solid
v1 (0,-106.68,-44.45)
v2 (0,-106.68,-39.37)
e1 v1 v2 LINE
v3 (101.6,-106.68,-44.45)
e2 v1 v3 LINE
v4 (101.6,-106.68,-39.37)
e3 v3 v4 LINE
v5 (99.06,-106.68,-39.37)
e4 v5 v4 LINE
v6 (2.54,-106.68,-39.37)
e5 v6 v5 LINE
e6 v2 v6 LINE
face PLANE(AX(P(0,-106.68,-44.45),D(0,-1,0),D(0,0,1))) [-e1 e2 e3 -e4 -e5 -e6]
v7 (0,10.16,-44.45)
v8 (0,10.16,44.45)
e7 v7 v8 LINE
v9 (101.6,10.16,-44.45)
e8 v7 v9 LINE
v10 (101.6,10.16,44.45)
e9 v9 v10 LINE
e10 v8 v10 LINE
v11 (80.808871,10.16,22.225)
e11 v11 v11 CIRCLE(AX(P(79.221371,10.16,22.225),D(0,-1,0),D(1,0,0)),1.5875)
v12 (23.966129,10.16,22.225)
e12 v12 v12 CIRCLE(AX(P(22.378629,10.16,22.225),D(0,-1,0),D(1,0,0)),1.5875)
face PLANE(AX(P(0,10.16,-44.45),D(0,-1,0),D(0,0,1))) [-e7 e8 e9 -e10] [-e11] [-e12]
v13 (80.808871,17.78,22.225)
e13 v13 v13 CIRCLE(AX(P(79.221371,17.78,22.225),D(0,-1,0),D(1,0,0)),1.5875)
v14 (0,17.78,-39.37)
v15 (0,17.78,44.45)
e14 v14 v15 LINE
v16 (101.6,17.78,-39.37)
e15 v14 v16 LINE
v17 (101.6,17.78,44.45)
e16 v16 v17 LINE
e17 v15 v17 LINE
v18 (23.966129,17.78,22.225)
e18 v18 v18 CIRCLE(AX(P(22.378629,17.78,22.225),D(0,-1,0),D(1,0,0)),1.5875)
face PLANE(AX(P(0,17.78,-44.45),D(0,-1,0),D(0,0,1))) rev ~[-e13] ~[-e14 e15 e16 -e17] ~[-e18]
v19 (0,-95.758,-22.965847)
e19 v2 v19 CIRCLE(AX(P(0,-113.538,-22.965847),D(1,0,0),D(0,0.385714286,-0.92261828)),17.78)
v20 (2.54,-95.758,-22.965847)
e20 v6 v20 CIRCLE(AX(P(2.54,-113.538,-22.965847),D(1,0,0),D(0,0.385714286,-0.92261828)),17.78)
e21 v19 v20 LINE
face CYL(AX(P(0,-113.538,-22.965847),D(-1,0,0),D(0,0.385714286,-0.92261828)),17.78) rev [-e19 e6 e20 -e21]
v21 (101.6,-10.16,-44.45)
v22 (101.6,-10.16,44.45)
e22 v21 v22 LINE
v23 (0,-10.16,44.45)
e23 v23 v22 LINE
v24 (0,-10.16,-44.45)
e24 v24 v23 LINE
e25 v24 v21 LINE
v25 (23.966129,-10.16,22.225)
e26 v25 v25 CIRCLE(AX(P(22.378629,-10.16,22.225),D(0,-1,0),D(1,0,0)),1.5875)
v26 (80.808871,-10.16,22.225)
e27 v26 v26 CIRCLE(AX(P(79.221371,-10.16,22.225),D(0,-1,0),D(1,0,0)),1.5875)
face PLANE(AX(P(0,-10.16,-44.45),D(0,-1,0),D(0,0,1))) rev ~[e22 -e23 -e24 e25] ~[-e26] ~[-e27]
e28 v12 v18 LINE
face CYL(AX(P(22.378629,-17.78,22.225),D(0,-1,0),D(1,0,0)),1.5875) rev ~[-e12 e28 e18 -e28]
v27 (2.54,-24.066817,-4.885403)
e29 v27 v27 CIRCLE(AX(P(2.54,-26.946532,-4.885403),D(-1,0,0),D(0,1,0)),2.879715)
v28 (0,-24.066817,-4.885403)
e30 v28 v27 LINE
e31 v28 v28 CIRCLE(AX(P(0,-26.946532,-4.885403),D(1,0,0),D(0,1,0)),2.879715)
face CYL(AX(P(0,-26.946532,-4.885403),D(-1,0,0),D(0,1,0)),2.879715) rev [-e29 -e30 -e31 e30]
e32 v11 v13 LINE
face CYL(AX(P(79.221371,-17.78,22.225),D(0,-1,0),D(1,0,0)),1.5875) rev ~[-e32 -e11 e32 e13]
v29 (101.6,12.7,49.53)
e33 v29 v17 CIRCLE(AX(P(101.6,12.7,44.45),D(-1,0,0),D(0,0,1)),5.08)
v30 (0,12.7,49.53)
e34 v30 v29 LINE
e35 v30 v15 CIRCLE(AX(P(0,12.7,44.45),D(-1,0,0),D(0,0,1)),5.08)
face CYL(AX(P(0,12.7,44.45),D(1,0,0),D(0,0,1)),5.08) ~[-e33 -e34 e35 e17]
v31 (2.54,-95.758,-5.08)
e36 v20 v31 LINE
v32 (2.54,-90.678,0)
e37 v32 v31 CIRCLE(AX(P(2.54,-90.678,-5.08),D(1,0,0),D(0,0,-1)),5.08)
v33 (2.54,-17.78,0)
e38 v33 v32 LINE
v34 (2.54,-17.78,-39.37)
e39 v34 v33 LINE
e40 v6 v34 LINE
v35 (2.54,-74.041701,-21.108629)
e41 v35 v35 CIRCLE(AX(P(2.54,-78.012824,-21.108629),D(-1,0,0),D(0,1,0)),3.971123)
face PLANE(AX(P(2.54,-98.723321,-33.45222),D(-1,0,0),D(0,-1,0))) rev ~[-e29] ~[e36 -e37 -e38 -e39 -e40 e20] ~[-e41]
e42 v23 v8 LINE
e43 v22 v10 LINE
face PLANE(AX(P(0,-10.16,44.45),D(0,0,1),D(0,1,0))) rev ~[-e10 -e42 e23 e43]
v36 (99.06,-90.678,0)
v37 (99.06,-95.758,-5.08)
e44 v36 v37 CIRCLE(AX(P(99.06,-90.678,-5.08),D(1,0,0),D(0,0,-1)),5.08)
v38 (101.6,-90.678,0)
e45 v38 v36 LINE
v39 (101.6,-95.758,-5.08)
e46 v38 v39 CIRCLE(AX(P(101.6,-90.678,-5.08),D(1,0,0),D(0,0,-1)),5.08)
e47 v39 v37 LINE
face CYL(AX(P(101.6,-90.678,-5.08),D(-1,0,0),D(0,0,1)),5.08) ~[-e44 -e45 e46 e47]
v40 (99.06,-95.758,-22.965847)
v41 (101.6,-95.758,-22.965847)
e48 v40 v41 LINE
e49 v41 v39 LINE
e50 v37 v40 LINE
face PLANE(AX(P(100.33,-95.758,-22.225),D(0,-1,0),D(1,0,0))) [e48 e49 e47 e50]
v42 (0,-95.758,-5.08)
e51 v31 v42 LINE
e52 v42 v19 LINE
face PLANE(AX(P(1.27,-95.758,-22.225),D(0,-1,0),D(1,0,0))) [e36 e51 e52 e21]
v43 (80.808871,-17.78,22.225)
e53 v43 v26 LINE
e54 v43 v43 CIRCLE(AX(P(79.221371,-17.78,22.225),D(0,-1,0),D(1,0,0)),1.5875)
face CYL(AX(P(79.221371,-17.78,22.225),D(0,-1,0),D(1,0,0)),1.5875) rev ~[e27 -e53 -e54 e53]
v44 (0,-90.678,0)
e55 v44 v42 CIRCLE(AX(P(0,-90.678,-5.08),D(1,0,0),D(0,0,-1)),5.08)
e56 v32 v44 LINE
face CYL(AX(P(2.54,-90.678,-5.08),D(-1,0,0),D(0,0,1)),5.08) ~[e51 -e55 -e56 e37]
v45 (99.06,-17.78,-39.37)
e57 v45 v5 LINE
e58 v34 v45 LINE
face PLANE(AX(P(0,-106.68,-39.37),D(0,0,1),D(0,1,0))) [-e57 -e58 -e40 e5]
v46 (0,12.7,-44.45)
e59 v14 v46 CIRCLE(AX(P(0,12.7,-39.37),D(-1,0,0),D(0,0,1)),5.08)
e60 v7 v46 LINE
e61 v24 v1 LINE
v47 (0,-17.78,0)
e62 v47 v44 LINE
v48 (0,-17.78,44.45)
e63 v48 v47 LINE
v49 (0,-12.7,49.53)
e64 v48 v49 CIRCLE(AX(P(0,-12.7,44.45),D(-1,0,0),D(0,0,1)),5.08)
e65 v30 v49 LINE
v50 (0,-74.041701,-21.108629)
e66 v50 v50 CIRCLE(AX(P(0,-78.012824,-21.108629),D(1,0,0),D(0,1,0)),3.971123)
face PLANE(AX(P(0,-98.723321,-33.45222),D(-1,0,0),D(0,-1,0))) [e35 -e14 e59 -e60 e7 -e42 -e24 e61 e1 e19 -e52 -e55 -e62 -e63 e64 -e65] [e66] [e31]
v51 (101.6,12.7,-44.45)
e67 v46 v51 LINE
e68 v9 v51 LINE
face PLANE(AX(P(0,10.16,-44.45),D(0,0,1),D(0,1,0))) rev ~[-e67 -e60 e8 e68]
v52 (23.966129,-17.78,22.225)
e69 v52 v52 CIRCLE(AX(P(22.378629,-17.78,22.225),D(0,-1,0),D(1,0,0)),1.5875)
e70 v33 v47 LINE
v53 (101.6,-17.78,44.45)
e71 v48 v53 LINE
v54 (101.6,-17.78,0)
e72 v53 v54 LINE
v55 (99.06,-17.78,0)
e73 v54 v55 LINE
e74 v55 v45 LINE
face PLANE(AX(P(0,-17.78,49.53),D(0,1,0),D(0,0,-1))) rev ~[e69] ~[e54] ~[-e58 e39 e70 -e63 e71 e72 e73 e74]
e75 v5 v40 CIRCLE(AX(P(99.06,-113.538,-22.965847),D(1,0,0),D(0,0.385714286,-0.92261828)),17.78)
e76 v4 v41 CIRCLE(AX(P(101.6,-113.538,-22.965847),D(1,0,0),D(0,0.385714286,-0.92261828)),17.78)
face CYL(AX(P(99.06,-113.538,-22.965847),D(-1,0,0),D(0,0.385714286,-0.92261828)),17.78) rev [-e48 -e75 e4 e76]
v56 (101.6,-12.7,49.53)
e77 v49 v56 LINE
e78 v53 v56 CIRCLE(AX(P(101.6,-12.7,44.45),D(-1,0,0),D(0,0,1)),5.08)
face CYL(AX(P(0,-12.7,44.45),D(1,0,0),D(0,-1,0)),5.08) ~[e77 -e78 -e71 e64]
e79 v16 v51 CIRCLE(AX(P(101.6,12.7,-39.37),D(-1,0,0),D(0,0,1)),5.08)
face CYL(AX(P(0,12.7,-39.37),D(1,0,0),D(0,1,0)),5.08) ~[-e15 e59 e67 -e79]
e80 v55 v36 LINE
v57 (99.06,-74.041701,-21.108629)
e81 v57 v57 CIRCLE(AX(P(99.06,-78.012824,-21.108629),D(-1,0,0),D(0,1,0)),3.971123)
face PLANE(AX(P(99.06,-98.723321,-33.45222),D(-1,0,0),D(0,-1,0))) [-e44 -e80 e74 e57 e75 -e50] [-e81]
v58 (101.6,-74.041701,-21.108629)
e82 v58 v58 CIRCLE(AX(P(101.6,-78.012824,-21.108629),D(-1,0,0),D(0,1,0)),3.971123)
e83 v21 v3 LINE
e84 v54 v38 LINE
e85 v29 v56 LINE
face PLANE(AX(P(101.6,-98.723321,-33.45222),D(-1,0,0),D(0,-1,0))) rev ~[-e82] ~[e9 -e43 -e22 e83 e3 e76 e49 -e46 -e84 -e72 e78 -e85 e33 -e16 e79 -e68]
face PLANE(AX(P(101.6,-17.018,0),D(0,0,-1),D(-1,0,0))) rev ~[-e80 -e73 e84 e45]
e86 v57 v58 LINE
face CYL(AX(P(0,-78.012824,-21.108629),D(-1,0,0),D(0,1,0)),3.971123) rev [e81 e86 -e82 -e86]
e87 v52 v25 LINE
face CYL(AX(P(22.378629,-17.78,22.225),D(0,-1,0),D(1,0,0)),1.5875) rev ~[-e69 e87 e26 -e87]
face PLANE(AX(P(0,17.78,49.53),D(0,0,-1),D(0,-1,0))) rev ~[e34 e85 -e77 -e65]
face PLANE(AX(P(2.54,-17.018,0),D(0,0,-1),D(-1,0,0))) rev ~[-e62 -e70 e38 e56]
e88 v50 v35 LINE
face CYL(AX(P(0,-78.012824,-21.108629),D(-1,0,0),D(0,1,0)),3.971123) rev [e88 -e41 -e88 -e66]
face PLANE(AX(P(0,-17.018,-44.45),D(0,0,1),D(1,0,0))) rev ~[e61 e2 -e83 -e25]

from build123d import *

# Parameters (mm, degrees)
F0_W        = 7.62
F0_H        = 88.9
F0_H_2      = 83.82
F0_W_2      = 88.9
F0_H_3      = 5.08
F1_DEPTH    = 101.6
F3_START    = 17.018
F3_DEPTH    = 78.74
F4_T1_DEPTH = 2.54
F4_T3_DEPTH = 2.54
F5_R        = 5.08
F6_R        = 5.08
F7_R        = 5.08
F8_R        = 3.9711233586
F9_DEPTH    = 154.686
F10_R       = 2.8797148657
F11_DEPTH   = 33.782
F12_R       = 1.5875
F13_DEPTH   = 85.344


# Not quite as in the source:
# - a fillet or chamfer that OpenCascade refuses, or shapes differently, is made with other operations: its cross-section is extruded or revolved along the edge and cut away or added


with BuildPart() as f1:
    # F0 (on Right) → F1 (new body)
    with BuildSketch(Plane.YZ):
        with Locations((13.97, 0)):
            Rectangle(F0_W, F0_H)
        Polygon((-10.16, 44.45), (10.16, 44.45), (17.78, 44.45), (17.78, 49.53), (-17.78, 49.53), (-17.78, 44.45), align=None)
        with Locations((-13.97, 2.54)):
            Rectangle(F0_W, F0_H_2)
        with Locations((-62.23, -41.91)):
            Rectangle(F0_W_2, F0_H_3)
        with Locations((-13.97, -41.91)):
            Rectangle(F0_W, F0_H_3)
    extrude(amount=F1_DEPTH)

    # F2 (on Front) → F3 (join)
    with BuildSketch(Plane.XZ.offset(F3_START)):
        Polygon((0, 0), (0, -39.37), (0, -44.45), (2.54, -44.45), (2.54, 0), align=None)
        Polygon((101.6, 0), (99.06, 0), (99.06, -44.45), (101.6, -44.45), (101.6, -39.37), align=None)
    extrude(amount=F3_DEPTH)

    # F4: fillet of radius 17.78 on 2 edges, made by hand

    # F4_s2 → F4_t1 (join)
    with BuildSketch(Plane.YZ.offset(99.06)):
        with BuildLine():
            ThreePointArc((-106.68, -39.37), (-98.7382763539, -32.8196066778), (-95.758, -22.9658469893))
            Line((-95.758, -22.9658469893), (-95.758, -39.37))
            Line((-95.758, -39.37), (-106.68, -39.37))
        make_face()
    extrude(amount=F4_T1_DEPTH)

    # F4_s4 → F4_t3 (join)
    with BuildSketch(Plane.YZ):
        with BuildLine():
            ThreePointArc((-106.68, -39.37), (-98.7382763539, -32.8196066778), (-95.758, -22.9658469893))
            Line((-95.758, -22.9658469893), (-95.758, -39.37))
            Line((-95.758, -39.37), (-106.68, -39.37))
        make_face()
    extrude(amount=F4_T3_DEPTH)

    # F5
    f5_edges = [f1.edges().sort_by_distance(p)[0] for p in [
        (1.27, -95.758, 0),
        (100.33, -95.758, 0),
    ]]
    fillet(f5_edges, radius=F5_R)

    # F6
    f6_edges = [f1.edges().sort_by_distance(p)[0] for p in [
        (50.8, -17.78, 49.53),
        (50.8, 17.78, 49.53),
    ]]
    fillet(f6_edges, radius=F6_R)

    # F7
    f7_edges = [f1.edges().sort_by_distance(p)[0] for p in [
        (50.8, 17.78, -44.45),
    ]]
    fillet(f7_edges, radius=F7_R)

    # F8 (on Right) → F9 (cut)
    with BuildSketch(Plane.YZ):
        with Locations((-78.0128240585, -21.108629182)):
            Circle(F8_R)
    extrude(amount=F9_DEPTH, mode=Mode.SUBTRACT)

    # F10 (on Right) → F11 (cut)
    with BuildSketch(Plane.YZ):
        with Locations((-26.9465316087, -4.8854034394)):
            Circle(F10_R)
    extrude(amount=F11_DEPTH, mode=Mode.SUBTRACT)

    # F12 (on face) → F13 (cut)
    with BuildSketch(Plane.XZ.offset(17.78)):
        with Locations((22.3786290735, 22.225)):
            Circle(F12_R)
        with Locations((79.2213709265, 22.225)):
            Circle(F12_R)
    extrude(amount=-F13_DEPTH, mode=Mode.SUBTRACT)


solid = f1.part
